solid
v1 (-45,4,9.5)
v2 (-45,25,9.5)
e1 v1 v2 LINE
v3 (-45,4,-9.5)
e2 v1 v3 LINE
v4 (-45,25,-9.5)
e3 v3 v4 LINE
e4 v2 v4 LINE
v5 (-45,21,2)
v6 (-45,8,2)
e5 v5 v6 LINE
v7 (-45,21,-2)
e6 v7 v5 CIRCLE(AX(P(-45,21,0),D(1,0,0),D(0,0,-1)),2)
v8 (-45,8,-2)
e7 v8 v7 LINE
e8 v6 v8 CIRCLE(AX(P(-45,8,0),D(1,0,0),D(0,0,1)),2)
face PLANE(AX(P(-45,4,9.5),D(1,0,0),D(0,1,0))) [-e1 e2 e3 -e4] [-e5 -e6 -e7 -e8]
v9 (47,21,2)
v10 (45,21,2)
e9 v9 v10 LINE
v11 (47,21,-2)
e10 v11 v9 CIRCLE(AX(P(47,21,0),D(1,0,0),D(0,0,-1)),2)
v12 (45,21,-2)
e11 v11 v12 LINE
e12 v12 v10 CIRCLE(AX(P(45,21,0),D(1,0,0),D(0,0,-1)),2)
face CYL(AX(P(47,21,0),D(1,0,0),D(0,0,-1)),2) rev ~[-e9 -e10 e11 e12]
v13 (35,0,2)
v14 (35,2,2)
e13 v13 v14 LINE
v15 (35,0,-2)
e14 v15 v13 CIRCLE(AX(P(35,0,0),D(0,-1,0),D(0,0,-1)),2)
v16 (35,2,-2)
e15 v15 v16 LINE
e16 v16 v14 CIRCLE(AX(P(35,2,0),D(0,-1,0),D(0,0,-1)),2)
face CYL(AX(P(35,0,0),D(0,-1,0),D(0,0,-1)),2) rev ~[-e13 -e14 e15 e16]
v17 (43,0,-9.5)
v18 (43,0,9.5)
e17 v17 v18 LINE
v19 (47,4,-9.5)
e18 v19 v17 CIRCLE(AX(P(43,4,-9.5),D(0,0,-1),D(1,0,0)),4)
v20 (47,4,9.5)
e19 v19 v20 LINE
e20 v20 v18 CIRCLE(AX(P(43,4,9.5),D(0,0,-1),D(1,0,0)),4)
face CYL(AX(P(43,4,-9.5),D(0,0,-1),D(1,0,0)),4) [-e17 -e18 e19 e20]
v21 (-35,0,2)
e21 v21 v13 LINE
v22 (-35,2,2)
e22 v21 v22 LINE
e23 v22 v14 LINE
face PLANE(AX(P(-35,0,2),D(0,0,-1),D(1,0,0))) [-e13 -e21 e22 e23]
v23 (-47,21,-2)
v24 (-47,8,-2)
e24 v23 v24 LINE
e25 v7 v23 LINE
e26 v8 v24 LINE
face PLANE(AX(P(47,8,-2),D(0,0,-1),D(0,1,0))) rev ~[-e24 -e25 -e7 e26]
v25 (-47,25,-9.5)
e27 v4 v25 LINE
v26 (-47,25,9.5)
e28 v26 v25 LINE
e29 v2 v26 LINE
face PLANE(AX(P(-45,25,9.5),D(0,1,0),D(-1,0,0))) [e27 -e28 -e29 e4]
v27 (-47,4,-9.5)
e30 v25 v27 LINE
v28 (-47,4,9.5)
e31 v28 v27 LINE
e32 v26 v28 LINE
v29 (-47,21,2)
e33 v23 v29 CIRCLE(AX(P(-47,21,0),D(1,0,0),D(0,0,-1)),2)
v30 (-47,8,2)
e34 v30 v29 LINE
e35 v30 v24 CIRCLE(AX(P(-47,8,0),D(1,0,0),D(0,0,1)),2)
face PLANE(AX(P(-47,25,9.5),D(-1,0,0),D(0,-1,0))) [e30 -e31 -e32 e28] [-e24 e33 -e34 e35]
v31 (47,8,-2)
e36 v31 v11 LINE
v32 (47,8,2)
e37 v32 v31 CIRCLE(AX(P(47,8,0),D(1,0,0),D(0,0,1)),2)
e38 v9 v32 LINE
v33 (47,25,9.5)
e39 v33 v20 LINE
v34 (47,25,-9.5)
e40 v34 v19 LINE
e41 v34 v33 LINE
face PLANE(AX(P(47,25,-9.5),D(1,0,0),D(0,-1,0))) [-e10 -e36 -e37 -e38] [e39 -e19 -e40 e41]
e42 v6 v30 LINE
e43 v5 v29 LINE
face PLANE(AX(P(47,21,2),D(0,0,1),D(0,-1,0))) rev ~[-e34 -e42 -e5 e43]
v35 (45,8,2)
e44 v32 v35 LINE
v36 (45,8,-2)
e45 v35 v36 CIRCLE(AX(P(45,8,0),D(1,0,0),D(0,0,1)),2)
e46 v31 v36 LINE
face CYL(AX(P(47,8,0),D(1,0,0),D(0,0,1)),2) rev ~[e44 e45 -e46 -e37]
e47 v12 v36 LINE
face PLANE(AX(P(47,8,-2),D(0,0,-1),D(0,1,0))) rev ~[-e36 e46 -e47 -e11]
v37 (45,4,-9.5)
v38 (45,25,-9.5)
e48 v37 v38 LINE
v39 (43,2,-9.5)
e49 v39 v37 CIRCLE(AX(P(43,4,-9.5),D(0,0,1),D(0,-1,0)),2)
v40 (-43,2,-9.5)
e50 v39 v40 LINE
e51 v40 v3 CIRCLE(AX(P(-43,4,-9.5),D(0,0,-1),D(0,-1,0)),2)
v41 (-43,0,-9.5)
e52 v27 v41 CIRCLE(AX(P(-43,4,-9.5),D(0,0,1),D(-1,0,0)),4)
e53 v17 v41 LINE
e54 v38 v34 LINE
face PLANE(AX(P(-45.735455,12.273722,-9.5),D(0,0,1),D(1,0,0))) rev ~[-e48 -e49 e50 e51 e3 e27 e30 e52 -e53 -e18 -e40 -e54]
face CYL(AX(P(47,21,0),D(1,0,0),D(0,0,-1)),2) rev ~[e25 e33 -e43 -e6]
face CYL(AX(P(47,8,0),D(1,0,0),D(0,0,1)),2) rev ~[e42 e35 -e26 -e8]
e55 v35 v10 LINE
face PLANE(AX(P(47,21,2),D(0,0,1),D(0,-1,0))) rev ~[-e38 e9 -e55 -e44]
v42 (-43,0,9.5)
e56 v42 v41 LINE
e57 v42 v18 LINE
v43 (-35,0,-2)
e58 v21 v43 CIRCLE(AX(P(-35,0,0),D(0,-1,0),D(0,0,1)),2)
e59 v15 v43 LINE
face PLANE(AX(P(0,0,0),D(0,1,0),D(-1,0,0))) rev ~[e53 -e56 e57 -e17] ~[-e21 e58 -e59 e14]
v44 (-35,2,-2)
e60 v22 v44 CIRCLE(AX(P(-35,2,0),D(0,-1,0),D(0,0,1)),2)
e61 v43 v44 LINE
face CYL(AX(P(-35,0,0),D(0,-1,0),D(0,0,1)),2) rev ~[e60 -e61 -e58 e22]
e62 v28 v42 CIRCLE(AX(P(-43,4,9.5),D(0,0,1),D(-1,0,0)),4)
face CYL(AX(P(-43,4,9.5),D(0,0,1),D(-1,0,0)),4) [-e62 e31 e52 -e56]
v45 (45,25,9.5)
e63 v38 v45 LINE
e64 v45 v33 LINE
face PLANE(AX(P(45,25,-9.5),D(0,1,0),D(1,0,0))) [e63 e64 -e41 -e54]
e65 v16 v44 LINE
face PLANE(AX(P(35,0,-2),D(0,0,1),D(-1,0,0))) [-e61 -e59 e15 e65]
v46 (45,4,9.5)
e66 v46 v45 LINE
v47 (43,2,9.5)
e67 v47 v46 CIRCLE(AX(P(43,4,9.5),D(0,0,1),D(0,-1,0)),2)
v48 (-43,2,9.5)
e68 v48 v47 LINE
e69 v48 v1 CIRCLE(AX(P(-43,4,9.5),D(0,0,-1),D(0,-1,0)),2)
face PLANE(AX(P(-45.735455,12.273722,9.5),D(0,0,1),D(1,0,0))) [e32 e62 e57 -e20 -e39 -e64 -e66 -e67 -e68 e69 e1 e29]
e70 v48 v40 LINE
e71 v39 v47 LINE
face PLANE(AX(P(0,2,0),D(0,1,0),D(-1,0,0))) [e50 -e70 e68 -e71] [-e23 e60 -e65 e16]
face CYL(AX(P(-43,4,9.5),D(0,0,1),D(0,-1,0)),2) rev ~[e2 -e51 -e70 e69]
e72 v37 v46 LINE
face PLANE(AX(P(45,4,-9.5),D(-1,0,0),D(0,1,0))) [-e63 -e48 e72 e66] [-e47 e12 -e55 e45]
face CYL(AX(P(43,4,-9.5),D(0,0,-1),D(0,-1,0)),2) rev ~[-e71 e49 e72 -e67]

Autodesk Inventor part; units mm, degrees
ref_plane "YZ Plane" through (0, 0, 0) normal (1, 0, 0) x (0, 1, 0)
ref_plane "XZ Plane" through (0, 0, 0) normal (0, 1, 0) x (-1, 0, 0)
ref_plane "XY Plane" through (0, 0, 0) normal (0, 0, 1) x (1, 0, 0)
sketch "スケッチ1" plane through (0, 0, 0) normal (0, 1, 0) x (-1, 0, 0)
  line L0 (-47, -9.5) -> (47, -9.5)
  line L1 (47, -9.5) -> (47, 9.5)
  line L2 (47, 9.5) -> (-47, 9.5)
  line L3 (-47, 9.5) -> (-47, -9.5)
  line L4 (-47, -9.5) -> (47, 9.5) construction
  line L5 (47, -9.5) -> (-47, 9.5) construction
  point P0 (0, 0)
  dimension "d0" = 94
  dimension "d1" = 19
extrude "プレート1" add sketch "スケッチ1" along normal blind 2
sketch "スケッチ2" plane through (45, 0, -9.5) normal (1, 0, 0) x (0, 1, 0)
  line L0 (0, 19) -> (0, 0)
  line L1 (0, 0) -> (25, 0)
  line L2 (25, 0) -> (25, 19)
  line L3 (25, 19) -> (0, 19)
edge flange "フランジ1" height 25 angle 90 thickness 2 bend radius 2 thickness toward (1, 0, 0) relief tear relief width 2 relief depth 1 edges at (47, 2, 0) wall of the first edge with corners at (45, 0, 9.5) (45, 0, -9.5) (45, 25, -9.5) (45, 25, 9.5)
bend "曲げ1"
corner "コーナー1"
sketch "スケッチ3" plane through (-45, 0, 9.5) normal (-1, 0, 0) x (0, -1, 0)
  line L0 (0, -19) -> (0, 0)
  line L1 (0, 0) -> (-25, 0)
  line L2 (-25, 0) -> (-25, -19)
  line L3 (-25, -19) -> (0, -19)
edge flange "フランジ2" height 25 angle 90 thickness 2 bend radius 2 thickness toward (-1, 0, 0) relief tear relief width 2 relief depth 1 edges at (-47, 2, 0) wall of the first edge with corners at (-45, 0, -9.5) (-45, 0, 9.5) (-45, 25, 9.5) (-45, 25, -9.5)
bend "曲げ2"
corner "コーナー2"
sketch "スケッチ5" plane through (0, 0, 0) normal (0, -1, 0) x (1, 0, 0)
  arc A0 (-35, 2) -> (-35, -2) centre (-35, 0) ccw
  arc A1 (35, -2) -> (35, 2) centre (35, 0) ccw
  line L0 (-35, 2) -> (35, 2)
  line L1 (35, -2) -> (-35, -2)
  point P0 (0, 0)
  dimension "d31" = 4
  dimension "d32" = 2
  dimension "d33" = 2
  dimension "d34" = 2
  dimension "d35" = 35
  dimension "d36" = 35
extrude "押し出し1" cut sketch "スケッチ5" against normal blind 2
sketch "スケッチ6" plane through (47, 25, 9.5) normal (1, 0, 0) x (0, 0, -1)
  point P0 (9.5, -25)
sketch "スケッチ7" plane through (47, 25, 9.5) normal (1, 0, 0) x (0, 0, -1)
  line L0 (7.5, -4) -> (7.5, -17)
  arc A0 (7.5, -17) -> (11.5, -17) centre (9.5, -17) ccw
  line L1 (11.5, -17) -> (11.5, -4)
  arc A1 (11.5, -4) -> (7.5, -4) centre (9.5, -4) ccw
  line L2 (0, 0) -> (19, 0) projected
  line L3 (0, -21) -> (19, -21) projected
  point P0 (9.5, -25)
  point P1 (9.5, 0)
  dimension "d45" = 4
  dimension "d46" = 4
  dimension "d47" = 2
extrude "押し出し2" cut sketch "スケッチ7" against normal blind 100
equation "\"d2\" = Thickness"
equation "\"d3\" = BendReliefWidth"
equation "\"d4\" = BendReliefDepth"
equation "\"d5\" = MinimumRemnant"
equation "\"d6\" = TransitionRadius"
equation "\"d9\" = BendRadius"
equation "\"d10\" = CornerReliefSize"
equation "\"d11\" = GapSize"
equation "\"d12\" = JacobiRadiusSize"
equation "\"d13\" = BendReliefWidth"
equation "\"d14\" = BendReliefDepth"
equation "\"d15\" = MinimumRemnant"
equation "\"d16\" = TransitionRadius"
equation "\"d19\" = BendRadius"
equation "\"d20\" = CornerReliefSize"
equation "\"d21\" = GapSize"
equation "\"d22\" = JacobiRadiusSize"
equation "\"BendRadius\" = Thickness"
equation "\"BendReliefWidth\" = Thickness"
equation "\"BendReliefDepth\" = 0.5 * Thickness"
equation "\"CornerReliefSize\" = 4 * Thickness"
equation "\"MinimumRemnant\" = 2 * Thickness"
equation "\"TransitionRadius\" = BendRadius"
equation "\"JacobiRadiusSize\" = BendRadius"
equation "\"GapSize\" = Thickness"
equation "\"Thickness\" = 2"
properties part number "cup" material "アルミニウム 6061"
